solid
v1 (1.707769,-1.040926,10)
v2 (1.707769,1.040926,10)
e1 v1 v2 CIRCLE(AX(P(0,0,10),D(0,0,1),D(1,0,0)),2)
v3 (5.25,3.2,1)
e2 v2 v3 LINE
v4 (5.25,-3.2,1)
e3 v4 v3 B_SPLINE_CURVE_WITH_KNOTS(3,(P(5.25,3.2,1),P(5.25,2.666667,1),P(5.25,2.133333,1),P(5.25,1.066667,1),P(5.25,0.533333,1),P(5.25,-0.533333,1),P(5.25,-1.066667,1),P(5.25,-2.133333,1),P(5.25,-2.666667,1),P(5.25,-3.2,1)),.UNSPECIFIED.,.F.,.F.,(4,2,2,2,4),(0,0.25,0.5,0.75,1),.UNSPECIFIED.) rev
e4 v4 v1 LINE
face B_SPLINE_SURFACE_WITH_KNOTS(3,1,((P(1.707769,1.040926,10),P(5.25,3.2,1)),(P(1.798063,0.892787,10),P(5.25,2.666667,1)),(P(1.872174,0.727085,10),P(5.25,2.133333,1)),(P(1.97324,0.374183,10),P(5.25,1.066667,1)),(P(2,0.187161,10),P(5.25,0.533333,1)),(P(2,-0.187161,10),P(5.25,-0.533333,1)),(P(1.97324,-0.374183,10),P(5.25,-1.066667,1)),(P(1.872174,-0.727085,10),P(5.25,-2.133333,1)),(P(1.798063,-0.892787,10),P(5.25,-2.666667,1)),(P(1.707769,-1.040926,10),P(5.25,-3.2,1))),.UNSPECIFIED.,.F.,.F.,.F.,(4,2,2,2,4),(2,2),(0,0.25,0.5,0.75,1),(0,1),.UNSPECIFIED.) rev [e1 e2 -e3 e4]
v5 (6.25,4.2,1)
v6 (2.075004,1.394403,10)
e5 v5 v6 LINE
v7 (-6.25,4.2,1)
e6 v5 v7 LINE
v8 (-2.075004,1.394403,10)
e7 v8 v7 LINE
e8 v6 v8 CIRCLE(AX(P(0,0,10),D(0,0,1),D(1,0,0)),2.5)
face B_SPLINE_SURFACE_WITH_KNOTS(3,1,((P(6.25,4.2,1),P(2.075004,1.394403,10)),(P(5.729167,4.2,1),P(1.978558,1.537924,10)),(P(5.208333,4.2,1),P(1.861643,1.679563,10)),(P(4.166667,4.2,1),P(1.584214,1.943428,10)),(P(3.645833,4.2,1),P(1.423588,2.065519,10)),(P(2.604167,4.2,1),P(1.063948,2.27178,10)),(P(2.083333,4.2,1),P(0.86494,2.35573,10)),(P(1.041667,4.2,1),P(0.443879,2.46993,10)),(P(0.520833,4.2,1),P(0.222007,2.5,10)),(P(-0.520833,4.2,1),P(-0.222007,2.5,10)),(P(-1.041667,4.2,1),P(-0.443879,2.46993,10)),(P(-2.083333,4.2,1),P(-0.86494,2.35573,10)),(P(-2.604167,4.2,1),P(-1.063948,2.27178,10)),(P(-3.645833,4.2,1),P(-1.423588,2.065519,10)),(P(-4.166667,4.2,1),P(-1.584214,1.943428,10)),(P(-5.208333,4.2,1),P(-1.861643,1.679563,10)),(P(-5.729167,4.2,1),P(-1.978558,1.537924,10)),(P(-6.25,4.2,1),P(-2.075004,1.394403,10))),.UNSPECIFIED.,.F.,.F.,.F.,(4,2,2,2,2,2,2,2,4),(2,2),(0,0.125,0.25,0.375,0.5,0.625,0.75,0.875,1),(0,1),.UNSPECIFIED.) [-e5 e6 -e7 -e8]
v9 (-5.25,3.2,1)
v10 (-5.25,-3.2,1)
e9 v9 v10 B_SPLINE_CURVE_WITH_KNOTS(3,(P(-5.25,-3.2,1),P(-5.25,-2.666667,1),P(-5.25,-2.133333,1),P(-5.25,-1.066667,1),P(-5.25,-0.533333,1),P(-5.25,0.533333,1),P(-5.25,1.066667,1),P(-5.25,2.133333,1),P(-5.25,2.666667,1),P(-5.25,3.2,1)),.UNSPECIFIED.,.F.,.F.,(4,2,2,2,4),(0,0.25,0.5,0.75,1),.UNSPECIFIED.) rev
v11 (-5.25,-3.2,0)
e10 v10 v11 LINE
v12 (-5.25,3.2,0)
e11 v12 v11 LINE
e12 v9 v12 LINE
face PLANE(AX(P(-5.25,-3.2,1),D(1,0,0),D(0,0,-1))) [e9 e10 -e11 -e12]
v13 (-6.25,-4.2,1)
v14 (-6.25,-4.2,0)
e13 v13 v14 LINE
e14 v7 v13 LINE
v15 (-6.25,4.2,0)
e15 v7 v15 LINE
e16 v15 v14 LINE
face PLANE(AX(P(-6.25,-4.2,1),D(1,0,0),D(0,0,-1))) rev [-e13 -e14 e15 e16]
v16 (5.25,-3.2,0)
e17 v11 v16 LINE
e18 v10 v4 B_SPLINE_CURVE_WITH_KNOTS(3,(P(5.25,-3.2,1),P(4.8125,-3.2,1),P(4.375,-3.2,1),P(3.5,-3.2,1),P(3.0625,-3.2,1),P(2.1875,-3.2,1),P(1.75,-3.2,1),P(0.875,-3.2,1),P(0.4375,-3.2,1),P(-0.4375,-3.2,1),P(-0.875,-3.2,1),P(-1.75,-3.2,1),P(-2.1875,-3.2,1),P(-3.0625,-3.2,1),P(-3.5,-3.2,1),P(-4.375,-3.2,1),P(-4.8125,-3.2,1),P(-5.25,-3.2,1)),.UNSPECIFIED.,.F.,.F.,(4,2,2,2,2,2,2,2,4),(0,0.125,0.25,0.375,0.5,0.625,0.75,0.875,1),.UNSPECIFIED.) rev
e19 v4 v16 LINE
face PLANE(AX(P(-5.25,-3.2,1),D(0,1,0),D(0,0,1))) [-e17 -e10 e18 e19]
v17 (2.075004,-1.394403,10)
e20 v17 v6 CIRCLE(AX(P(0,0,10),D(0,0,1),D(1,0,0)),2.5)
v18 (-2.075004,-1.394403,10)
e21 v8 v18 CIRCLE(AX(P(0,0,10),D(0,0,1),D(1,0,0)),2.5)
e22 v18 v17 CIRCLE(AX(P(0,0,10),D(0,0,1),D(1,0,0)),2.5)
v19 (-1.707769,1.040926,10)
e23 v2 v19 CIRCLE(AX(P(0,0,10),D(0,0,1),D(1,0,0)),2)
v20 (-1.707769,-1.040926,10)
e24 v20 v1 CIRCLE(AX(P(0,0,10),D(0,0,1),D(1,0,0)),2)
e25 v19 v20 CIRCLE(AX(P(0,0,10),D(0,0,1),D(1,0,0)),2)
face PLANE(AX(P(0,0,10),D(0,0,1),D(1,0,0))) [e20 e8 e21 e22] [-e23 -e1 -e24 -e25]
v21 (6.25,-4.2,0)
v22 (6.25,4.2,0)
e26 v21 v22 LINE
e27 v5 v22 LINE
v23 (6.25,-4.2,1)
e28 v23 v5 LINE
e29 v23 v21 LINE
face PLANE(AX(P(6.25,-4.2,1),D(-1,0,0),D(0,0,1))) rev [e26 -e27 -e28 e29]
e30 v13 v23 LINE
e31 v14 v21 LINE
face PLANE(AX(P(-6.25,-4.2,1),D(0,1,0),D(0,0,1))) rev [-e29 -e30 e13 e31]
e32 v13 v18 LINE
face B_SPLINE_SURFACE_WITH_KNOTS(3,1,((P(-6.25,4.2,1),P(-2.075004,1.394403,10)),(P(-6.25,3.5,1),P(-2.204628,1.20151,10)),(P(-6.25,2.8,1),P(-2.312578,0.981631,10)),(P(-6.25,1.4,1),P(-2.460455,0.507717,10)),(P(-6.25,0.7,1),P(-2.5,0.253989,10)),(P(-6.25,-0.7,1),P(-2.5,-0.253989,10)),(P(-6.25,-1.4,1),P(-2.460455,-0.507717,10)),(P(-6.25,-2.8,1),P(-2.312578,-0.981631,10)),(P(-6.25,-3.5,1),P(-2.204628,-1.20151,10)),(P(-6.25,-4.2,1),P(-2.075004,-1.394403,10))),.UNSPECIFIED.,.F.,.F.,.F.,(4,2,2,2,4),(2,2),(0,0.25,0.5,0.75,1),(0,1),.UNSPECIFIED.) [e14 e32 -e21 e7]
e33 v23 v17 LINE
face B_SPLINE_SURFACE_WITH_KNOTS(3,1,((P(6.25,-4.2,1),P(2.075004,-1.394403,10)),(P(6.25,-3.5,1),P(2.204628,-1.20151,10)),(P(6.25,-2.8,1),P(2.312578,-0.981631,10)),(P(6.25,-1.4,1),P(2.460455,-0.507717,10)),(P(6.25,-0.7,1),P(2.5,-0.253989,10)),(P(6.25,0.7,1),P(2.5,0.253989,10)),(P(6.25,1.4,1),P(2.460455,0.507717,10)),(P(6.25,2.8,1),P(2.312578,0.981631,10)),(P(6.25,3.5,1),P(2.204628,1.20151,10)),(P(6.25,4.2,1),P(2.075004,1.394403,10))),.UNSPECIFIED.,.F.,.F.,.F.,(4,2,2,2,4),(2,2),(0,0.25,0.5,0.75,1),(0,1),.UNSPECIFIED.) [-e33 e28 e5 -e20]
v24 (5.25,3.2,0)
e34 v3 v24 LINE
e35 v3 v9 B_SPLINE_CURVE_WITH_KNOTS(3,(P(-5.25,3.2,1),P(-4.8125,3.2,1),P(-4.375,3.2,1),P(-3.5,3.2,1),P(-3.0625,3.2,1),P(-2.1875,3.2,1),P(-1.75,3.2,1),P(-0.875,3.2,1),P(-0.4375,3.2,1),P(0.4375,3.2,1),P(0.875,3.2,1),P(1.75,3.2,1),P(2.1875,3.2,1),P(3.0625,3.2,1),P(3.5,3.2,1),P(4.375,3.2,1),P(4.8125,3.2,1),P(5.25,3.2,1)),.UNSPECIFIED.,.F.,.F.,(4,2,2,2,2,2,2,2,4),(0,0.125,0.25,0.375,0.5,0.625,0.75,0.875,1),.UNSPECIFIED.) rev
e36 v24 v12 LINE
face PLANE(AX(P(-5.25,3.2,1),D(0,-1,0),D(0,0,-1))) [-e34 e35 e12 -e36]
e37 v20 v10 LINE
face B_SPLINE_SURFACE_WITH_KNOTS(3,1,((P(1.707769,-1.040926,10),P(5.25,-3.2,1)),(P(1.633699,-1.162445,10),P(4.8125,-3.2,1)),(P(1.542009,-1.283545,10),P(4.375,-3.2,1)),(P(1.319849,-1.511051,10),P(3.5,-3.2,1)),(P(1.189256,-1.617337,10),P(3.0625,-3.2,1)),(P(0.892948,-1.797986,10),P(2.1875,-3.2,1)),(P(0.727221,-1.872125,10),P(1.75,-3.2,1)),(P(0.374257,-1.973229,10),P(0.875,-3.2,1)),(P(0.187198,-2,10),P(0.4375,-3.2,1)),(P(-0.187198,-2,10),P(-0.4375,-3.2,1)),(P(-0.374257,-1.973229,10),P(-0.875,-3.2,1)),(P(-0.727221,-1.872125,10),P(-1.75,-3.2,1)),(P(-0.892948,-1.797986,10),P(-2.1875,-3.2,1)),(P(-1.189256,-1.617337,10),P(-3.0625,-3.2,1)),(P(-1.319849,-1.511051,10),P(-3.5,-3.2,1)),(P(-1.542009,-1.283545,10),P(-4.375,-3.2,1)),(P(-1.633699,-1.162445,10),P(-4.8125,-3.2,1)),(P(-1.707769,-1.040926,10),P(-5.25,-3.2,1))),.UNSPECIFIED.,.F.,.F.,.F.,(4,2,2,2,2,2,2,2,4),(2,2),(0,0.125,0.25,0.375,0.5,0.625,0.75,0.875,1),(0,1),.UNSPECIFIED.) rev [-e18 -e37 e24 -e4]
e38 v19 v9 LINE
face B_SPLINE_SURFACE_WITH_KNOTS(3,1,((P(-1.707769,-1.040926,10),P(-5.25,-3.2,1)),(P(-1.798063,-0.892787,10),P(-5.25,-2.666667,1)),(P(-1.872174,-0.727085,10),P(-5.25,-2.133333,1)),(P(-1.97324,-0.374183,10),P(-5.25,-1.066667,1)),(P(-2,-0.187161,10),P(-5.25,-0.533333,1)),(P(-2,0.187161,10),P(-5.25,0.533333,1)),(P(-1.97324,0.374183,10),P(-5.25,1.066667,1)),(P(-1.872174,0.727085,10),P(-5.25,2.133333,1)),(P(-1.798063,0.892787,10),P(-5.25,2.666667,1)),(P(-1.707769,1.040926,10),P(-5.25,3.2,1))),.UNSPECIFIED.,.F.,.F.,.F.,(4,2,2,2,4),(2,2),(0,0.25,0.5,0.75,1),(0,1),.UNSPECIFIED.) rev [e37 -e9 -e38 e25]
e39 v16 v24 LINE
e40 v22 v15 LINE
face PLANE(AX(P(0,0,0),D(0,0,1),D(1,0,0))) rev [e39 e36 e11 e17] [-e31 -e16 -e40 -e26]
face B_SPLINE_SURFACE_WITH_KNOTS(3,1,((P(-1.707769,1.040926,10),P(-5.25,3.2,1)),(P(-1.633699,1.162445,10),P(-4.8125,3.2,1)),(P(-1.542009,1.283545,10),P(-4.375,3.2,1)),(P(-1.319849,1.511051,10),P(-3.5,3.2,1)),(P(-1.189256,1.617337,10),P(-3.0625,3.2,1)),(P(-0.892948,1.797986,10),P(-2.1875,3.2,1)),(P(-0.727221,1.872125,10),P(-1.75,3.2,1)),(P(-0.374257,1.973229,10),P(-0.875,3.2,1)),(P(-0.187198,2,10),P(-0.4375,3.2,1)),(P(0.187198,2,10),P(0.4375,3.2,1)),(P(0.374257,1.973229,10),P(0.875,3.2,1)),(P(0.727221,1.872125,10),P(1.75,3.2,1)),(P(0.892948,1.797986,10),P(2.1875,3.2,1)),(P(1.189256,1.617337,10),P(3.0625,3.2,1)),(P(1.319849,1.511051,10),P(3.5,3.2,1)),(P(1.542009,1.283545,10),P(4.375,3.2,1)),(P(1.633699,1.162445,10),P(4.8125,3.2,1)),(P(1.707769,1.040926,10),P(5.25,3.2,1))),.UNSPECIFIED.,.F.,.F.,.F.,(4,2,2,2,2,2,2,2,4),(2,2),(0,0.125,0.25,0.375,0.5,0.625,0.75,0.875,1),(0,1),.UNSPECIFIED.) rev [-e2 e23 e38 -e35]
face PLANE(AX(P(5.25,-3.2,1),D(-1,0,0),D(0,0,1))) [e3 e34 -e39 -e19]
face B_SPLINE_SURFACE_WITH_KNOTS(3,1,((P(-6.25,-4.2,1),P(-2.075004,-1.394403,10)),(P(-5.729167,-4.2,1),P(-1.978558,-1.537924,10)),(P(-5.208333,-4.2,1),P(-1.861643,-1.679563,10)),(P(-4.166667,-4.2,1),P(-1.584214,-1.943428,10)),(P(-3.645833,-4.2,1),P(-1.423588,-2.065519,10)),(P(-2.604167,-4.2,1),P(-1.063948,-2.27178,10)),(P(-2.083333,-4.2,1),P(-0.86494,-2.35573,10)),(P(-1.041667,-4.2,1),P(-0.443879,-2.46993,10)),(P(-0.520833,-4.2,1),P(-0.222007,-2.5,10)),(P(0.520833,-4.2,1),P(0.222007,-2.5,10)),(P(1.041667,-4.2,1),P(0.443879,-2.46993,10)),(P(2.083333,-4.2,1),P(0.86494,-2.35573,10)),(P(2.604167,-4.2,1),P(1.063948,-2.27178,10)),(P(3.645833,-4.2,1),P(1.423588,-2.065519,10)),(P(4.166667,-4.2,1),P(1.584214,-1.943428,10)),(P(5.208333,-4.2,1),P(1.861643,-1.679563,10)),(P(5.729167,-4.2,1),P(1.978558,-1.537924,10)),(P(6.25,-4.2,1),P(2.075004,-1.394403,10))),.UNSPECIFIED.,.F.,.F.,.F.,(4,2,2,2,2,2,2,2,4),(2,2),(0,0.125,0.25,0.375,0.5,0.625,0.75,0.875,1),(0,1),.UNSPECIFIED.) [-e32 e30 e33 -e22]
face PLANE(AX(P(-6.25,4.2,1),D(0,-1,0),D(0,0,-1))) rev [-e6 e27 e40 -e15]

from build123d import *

# Parameters (mm, degrees)
SKETCH1_W           = 12.5
SKETCH1_H           = 8.4
SKETCH1_W_2         = 10.5
SKETCH1_H_2         = 6.4
BOSS_EXTRUDE1_DEPTH = 1


with BuildPart() as part:
    # Sketch1 → Boss-Extrude1 (new body)
    with BuildSketch(Plane.XY):
        Rectangle(SKETCH1_W, SKETCH1_H)
        Rectangle(SKETCH1_W_2, SKETCH1_H_2, mode=Mode.SUBTRACT)
    extrude(amount=BOSS_EXTRUDE1_DEPTH)

    # Sketch3 → Loft1 section 0
    with BuildSketch(Plane.XY.offset(1)):
        with BuildLine():
            Line((6.25, -4.2), (6.25, 4.2))
            Line((6.25, 4.2), (-6.25, 4.2))
            Line((-6.25, 4.2), (-6.25, -4.2))
            Line((-6.25, -4.2), (6.25, -4.2))
        make_face()
    # Sketch2 for Loft1 → Loft1 section 1
    with BuildSketch(Plane.XY.offset(10)):
        with BuildLine():
            # circular arc as an exact rational Bezier (weights 1, cos(half-angle), 1)
            Bezier((2.075003924, -1.394402637), (3.012042497, 0), (2.075003924, 1.394402637), weights=[1, 0.830001569, 1])
            Bezier((2.075003924, 1.394402637), (0, 4.482206096), (-2.075003924, 1.394402637), weights=[1, 0.557761055, 1])
            Bezier((-2.075003924, 1.394402637), (-3.012042497, 0), (-2.075003924, -1.394402637), weights=[1, 0.830001569, 1])
            Bezier((-2.075003924, -1.394402637), (0, -4.482206096), (2.075003924, -1.394402637), weights=[1, 0.557761055, 1])
        make_face()
    loft()

    # Cut-Loft1: read off the stored shape, not the designer's step
    # Cut-Loft1: loft between two sections, ruled curve by curve
    cut_loft1_from = [
        Edge.make_bspline([(1.707768655, -1.040925656, 10), (1.633699479, -1.162445397, 10), (1.542008876, -1.28354475, 10), (1.31984949, -1.511051231, 10), (1.189256111, -1.617336715, 10), (0.892947872, -1.797985608, 10), (0.72722112, -1.87212471, 10), (0.374256765, -1.973229171, 10), (0.187198335, -2, 10), (-0.187198335, -2, 10), (-0.374256765, -1.973229171, 10), (-0.72722112, -1.87212471, 10), (-0.892947872, -1.797985608, 10), (-1.189256111, -1.617336715, 10), (-1.31984949, -1.511051231, 10), (-1.542008876, -1.28354475, 10), (-1.633699479, -1.162445397, 10), (-1.707768655, -1.040925656, 10)], [0, 0, 0, 0, 0.125, 0.125, 0.25, 0.25, 0.375, 0.375, 0.5, 0.5, 0.625, 0.625, 0.75, 0.75, 0.875, 0.875, 1, 1, 1, 1], 3),
        Edge.make_bspline([(-1.707768655, -1.040925656, 10), (-1.798062507, -0.892787306, 10), (-1.872174068, -0.727085204, 10), (-1.973239973, -0.374182636, 10), (-2, -0.187161202, 10), (-2, 0.187161202, 10), (-1.973239973, 0.374182636, 10), (-1.872174068, 0.727085204, 10), (-1.798062507, 0.892787306, 10), (-1.707768655, 1.040925656, 10)], [0, 0, 0, 0, 0.25, 0.25, 0.5, 0.5, 0.75, 0.75, 1, 1, 1, 1], 3),
        Edge.make_bspline([(1.707768655, 1.040925656, 10), (1.798062507, 0.892787306, 10), (1.872174068, 0.727085204, 10), (1.973239973, 0.374182636, 10), (2, 0.187161202, 10), (2, -0.187161202, 10), (1.973239973, -0.374182636, 10), (1.872174068, -0.727085204, 10), (1.798062507, -0.892787306, 10), (1.707768655, -1.040925656, 10)], [0, 0, 0, 0, 0.25, 0.25, 0.5, 0.5, 0.75, 0.75, 1, 1, 1, 1], 3),
        Edge.make_bspline([(-1.707768655, 1.040925656, 10), (-1.633699479, 1.162445397, 10), (-1.542008876, 1.28354475, 10), (-1.31984949, 1.511051231, 10), (-1.189256111, 1.617336715, 10), (-0.892947872, 1.797985608, 10), (-0.72722112, 1.87212471, 10), (-0.374256765, 1.973229171, 10), (-0.187198335, 2, 10), (0.187198335, 2, 10), (0.374256765, 1.973229171, 10), (0.72722112, 1.87212471, 10), (0.892947872, 1.797985608, 10), (1.189256111, 1.617336715, 10), (1.31984949, 1.511051231, 10), (1.542008876, 1.28354475, 10), (1.633699479, 1.162445397, 10), (1.707768655, 1.040925656, 10)], [0, 0, 0, 0, 0.125, 0.125, 0.25, 0.25, 0.375, 0.375, 0.5, 0.5, 0.625, 0.625, 0.75, 0.75, 0.875, 0.875, 1, 1, 1, 1], 3),
    ]
    cut_loft1_to = [
        Edge.make_bspline([(5.25, -3.2, 1), (4.8125, -3.2, 1), (4.375, -3.2, 1), (3.5, -3.2, 1), (3.0625, -3.2, 1), (2.1875, -3.2, 1), (1.75, -3.2, 1), (0.875, -3.2, 1), (0.4375, -3.2, 1), (-0.4375, -3.2, 1), (-0.875, -3.2, 1), (-1.75, -3.2, 1), (-2.1875, -3.2, 1), (-3.0625, -3.2, 1), (-3.5, -3.2, 1), (-4.375, -3.2, 1), (-4.8125, -3.2, 1), (-5.25, -3.2, 1)], [0, 0, 0, 0, 0.125, 0.125, 0.25, 0.25, 0.375, 0.375, 0.5, 0.5, 0.625, 0.625, 0.75, 0.75, 0.875, 0.875, 1, 1, 1, 1], 3),
        Edge.make_bspline([(-5.25, -3.2, 1), (-5.25, -2.666666667, 1), (-5.25, -2.133333333, 1), (-5.25, -1.066666667, 1), (-5.25, -0.533333333, 1), (-5.25, 0.533333333, 1), (-5.25, 1.066666667, 1), (-5.25, 2.133333333, 1), (-5.25, 2.666666667, 1), (-5.25, 3.2, 1)], [0, 0, 0, 0, 0.25, 0.25, 0.5, 0.5, 0.75, 0.75, 1, 1, 1, 1], 3),
        Edge.make_bspline([(5.25, 3.2, 1), (5.25, 2.666666667, 1), (5.25, 2.133333333, 1), (5.25, 1.066666667, 1), (5.25, 0.533333333, 1), (5.25, -0.533333333, 1), (5.25, -1.066666667, 1), (5.25, -2.133333333, 1), (5.25, -2.666666667, 1), (5.25, -3.2, 1)], [0, 0, 0, 0, 0.25, 0.25, 0.5, 0.5, 0.75, 0.75, 1, 1, 1, 1], 3),
        Edge.make_bspline([(-5.25, 3.2, 1), (-4.8125, 3.2, 1), (-4.375, 3.2, 1), (-3.5, 3.2, 1), (-3.0625, 3.2, 1), (-2.1875, 3.2, 1), (-1.75, 3.2, 1), (-0.875, 3.2, 1), (-0.4375, 3.2, 1), (0.4375, 3.2, 1), (0.875, 3.2, 1), (1.75, 3.2, 1), (2.1875, 3.2, 1), (3.0625, 3.2, 1), (3.5, 3.2, 1), (4.375, 3.2, 1), (4.8125, 3.2, 1), (5.25, 3.2, 1)], [0, 0, 0, 0, 0.125, 0.125, 0.25, 0.25, 0.375, 0.375, 0.5, 0.5, 0.625, 0.625, 0.75, 0.75, 0.875, 0.875, 1, 1, 1, 1], 3),
    ]
    cut_loft1 = Solid(Shell([*[Face.make_surface_from_curves(cut_loft1_from[k], cut_loft1_to[k]) for k in range(4)], Face(Wire(cut_loft1_from)), Face(Wire(cut_loft1_to))]))
    add(cut_loft1, mode=Mode.SUBTRACT)


solid = part.part
